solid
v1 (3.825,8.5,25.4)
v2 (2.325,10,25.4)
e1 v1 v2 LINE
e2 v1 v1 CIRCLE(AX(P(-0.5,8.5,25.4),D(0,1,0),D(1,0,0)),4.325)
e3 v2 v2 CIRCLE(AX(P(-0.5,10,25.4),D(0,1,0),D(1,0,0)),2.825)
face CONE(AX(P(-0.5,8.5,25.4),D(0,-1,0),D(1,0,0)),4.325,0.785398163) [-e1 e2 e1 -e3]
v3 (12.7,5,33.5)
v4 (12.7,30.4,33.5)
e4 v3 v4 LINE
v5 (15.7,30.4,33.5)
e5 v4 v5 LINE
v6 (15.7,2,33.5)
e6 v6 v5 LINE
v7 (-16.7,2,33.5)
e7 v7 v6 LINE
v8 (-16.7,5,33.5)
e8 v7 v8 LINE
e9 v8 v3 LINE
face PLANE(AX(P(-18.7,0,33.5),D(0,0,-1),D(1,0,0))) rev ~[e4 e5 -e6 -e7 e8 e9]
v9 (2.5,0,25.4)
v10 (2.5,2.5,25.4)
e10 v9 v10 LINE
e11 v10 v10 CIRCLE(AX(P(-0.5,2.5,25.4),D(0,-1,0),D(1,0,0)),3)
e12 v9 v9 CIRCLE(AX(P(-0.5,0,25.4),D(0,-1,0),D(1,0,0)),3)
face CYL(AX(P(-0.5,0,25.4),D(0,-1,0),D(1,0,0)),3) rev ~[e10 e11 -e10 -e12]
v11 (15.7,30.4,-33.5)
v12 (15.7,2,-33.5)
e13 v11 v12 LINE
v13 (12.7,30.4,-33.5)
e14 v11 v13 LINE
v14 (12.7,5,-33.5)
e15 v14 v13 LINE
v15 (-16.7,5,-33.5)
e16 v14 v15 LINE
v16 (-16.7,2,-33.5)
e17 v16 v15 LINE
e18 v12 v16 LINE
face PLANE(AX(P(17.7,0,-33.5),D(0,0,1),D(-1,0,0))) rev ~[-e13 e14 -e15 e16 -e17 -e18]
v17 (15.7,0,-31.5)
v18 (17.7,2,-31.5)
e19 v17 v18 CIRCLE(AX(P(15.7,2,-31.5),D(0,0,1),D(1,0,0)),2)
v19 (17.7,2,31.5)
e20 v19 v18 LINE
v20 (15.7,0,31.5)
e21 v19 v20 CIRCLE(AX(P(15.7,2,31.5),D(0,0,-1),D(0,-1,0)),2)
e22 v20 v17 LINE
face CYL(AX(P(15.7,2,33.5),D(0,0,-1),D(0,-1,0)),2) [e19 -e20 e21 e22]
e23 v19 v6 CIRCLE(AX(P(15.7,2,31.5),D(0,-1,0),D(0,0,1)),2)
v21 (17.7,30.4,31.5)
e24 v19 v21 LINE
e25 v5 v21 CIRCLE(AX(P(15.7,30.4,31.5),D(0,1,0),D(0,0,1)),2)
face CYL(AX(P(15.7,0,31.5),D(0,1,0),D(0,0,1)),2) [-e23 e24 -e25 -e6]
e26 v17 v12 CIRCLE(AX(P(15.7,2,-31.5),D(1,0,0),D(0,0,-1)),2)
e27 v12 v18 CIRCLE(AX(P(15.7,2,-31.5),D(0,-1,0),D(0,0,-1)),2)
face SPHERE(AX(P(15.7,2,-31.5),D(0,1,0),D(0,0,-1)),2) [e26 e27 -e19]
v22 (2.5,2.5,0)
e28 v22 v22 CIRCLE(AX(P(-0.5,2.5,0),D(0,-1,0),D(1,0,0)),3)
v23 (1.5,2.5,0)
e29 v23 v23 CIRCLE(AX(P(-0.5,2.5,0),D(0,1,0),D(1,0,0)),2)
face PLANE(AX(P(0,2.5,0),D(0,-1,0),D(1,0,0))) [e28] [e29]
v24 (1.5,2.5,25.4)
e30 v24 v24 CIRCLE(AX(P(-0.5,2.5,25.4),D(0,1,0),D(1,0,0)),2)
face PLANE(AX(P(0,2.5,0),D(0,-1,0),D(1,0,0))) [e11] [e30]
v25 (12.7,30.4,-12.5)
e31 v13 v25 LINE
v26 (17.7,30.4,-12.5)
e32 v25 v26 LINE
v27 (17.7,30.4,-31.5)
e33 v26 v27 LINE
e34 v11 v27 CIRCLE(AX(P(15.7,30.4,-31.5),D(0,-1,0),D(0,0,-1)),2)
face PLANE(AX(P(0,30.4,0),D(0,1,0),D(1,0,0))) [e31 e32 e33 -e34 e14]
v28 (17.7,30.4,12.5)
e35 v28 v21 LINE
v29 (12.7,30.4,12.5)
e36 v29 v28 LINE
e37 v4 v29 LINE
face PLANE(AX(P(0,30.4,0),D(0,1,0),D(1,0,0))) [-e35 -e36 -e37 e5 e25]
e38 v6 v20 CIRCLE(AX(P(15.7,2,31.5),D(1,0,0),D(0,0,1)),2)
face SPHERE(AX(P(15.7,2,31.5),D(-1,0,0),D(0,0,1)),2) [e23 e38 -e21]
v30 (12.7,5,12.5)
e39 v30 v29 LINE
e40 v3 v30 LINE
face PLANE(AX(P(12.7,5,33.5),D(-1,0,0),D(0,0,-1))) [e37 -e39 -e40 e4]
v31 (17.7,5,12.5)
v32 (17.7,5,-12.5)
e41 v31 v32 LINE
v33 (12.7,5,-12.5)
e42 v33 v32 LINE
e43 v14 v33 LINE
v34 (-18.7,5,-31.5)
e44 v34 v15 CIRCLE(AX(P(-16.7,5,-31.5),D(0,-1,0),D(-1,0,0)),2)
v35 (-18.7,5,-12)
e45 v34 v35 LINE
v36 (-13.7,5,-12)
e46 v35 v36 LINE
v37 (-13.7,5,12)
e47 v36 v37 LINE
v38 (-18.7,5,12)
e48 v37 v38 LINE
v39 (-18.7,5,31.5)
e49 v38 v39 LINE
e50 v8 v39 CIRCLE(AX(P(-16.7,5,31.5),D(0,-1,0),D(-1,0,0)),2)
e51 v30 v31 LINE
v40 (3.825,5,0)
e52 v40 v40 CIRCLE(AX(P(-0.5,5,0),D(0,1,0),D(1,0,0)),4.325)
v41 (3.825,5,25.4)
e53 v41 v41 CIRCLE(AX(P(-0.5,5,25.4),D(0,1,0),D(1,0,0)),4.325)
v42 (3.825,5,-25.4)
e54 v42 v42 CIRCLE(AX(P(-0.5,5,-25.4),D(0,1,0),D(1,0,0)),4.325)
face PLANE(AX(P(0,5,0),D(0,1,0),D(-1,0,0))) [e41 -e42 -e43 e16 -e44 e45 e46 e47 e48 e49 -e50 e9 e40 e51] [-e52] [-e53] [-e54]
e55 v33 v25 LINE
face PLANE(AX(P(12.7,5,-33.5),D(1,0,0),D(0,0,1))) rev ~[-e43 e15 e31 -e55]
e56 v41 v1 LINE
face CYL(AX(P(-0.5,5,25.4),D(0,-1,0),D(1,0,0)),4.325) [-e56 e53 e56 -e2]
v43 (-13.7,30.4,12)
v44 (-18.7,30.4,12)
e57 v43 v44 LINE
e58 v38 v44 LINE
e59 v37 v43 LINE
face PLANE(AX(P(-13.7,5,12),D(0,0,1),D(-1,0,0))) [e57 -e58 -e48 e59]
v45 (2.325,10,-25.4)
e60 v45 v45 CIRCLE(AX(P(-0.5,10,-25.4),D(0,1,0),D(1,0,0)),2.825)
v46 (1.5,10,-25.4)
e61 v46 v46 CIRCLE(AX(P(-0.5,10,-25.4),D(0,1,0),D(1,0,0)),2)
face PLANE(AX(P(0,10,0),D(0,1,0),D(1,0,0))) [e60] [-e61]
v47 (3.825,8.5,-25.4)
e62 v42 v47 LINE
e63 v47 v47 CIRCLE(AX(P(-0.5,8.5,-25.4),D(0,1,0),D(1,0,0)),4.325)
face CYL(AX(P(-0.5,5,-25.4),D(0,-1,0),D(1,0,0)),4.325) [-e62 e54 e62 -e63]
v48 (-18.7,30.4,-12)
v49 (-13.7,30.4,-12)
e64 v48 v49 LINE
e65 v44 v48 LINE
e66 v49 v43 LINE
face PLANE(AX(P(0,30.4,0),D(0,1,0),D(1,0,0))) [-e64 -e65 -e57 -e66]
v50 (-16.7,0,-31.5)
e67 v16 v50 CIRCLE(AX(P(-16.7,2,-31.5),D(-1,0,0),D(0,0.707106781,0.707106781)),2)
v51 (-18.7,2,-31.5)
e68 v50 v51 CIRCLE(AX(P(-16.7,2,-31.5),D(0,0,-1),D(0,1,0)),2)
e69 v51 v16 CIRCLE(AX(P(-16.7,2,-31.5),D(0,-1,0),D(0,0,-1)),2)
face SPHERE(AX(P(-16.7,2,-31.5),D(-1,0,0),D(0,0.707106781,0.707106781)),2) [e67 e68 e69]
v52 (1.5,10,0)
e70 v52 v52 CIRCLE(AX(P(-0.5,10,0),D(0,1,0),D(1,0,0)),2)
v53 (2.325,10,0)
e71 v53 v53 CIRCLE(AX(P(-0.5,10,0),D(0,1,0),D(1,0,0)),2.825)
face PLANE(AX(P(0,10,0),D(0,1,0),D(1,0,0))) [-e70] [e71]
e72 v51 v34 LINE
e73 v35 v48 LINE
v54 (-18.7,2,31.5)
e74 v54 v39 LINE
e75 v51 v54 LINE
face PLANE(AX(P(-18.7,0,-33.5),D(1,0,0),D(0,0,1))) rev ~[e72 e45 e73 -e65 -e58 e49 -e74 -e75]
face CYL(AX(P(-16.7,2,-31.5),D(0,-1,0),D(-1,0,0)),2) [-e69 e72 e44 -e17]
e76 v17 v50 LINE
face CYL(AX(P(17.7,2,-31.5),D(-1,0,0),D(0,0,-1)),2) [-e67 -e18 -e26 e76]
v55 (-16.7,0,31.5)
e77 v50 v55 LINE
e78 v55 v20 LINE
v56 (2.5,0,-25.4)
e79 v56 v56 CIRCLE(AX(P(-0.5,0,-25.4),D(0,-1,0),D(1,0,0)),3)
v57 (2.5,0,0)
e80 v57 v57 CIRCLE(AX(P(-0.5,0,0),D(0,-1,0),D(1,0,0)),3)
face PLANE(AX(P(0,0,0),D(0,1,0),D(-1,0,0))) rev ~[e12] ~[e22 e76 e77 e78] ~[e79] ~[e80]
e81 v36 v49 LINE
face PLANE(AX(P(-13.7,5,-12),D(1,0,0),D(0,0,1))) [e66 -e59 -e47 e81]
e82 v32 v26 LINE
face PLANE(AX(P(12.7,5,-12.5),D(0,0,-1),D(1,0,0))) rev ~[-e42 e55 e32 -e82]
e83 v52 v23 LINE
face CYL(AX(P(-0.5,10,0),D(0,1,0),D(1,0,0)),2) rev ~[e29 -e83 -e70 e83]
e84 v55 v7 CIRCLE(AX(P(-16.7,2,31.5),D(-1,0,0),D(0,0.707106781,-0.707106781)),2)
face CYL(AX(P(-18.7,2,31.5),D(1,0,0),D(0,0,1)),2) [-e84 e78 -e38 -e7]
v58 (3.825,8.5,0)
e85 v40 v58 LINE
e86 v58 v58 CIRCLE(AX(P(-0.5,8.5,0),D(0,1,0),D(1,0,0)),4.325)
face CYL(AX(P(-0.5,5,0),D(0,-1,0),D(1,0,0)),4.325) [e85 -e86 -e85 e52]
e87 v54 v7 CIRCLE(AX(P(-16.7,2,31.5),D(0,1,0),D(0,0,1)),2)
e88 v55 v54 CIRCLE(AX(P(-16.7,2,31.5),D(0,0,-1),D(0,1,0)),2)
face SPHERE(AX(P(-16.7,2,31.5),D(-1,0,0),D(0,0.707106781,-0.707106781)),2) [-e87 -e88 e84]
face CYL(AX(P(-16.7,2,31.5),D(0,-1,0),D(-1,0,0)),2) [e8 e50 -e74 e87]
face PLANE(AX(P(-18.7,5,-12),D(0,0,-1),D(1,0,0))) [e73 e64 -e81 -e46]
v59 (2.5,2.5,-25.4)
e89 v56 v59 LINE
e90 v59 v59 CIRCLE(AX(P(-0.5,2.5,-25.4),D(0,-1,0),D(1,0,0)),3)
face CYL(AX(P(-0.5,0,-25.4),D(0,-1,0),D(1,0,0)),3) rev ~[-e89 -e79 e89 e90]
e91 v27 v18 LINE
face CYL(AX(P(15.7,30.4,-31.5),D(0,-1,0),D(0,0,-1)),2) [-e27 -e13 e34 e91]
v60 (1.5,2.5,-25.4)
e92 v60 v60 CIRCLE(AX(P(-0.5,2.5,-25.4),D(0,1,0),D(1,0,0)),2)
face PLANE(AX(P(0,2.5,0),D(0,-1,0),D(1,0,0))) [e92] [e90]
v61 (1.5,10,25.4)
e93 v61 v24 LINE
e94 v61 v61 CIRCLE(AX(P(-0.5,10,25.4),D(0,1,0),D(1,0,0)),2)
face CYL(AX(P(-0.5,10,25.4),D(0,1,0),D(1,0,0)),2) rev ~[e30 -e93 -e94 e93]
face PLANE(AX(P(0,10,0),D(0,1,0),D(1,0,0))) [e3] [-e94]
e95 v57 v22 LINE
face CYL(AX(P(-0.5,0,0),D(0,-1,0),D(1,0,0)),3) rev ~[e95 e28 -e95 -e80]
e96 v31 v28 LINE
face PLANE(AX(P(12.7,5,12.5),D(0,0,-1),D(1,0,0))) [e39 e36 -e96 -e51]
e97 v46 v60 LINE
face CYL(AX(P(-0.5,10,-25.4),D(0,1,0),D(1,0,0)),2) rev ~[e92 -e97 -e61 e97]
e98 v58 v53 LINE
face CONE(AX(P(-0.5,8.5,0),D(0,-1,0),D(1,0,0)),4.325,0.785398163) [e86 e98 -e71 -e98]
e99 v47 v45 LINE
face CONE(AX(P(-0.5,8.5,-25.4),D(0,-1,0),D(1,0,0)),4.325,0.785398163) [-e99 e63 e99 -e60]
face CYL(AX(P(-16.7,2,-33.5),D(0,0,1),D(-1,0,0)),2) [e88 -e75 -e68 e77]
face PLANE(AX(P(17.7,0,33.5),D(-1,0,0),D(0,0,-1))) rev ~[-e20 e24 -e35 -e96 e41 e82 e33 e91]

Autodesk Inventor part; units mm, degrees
ref_plane "YZ Plane" through (0, 0, 0) normal (1, 0, 0) x (0, 1, 0)
ref_plane "XZ Plane" through (0, 0, 0) normal (0, 1, 0) x (-1, 0, 0)
ref_plane "XY Plane" through (0, 0, 0) normal (0, 0, 1) x (1, 0, 0)
sketch "Sketch1" plane through (0, 0, 0) normal (0, 1, 0) x (-1, 0, 0)
  line L0 (18.7, 33.5) -> (-17.7, 33.5)
  line L1 (-17.7, 33.5) -> (-17.7, -33.5)
  line L2 (-17.7, -33.5) -> (18.7, -33.5)
  line L3 (18.7, -33.5) -> (18.7, 33.5)
  point P0 (0, 0)
  dimension "d0" = 36.4
  dimension "d1" = 67
extrude "Extrusion1" add sketch "Sketch1" along normal blind 5
sketch "Sketch2" plane through (0, 5, 0) normal (0, 1, 0) x (1, 0, 0)
  line L0 (-18.7, -33.5) -> (17.7, -33.5) projected
  line L1 (17.7, -33.5) -> (12.7, -33.5)
  line L2 (12.7, -33.5) -> (12.7, -12.5)
  line L3 (12.7, -12.5) -> (17.7, -12.5)
  line L4 (17.7, -12.5) -> (17.7, -33.5)
  line L5 (17.7, -33.5) -> (17.7, 33.5) projected
  line L6 (17.7, 33.5) -> (12.7, 33.5)
  line L7 (12.7, 33.5) -> (12.7, 12.5)
  line L8 (12.7, 12.5) -> (17.7, 12.5)
  line L9 (17.7, 12.5) -> (17.7, 33.5)
  point P0 (0, 0)
  dimension "d4" = 5
  dimension "d5" = 21
  dimension "d6" = 5
  dimension "d7" = 21
extrude "Extrusion2" add sketch "Sketch2" along normal blind 25.4
fillet "Fillet2" radius 2 6 edges at (-0.5, 0, 33.5) (-18.7, 0, 0) (17.7, 15.2, 33.5) (17.7, 15.2, -33.5) (-0.5, 0, -33.5) (17.7, 0, 0)
sketch "Sketch6" plane through (0, 5, 0) normal (0, 1, 0) x (1, 0, 0)
  line L0 (-18.7, -33.5) -> (-18.7, 33.5) projected
  line L1 (-18.7, 12) -> (-13.7, 12)
  line L2 (-13.7, 12) -> (-13.7, -12)
  line L3 (-13.7, -12) -> (-18.7, -12)
  line L4 (-18.7, -12) -> (-18.7, 12)
  point P0 (0, 0)
  point P1 (-18.7, -12)
  dimension "d26" = 5
  dimension "d27" = 24
extrude "Extrusion6" add sketch "Sketch6" along normal blind 25.4
fillet "Fillet3" radius 2 4 edges at (-18.1142, 0.5858, 32.9142) (-18.7, 3.5, 33.5) (-18.1142, 0.5858, -32.9142) (-18.7, 3.5, -33.5)
sketch "Sketch8" plane through (0, 5, 0) normal (0, 1, 0) x (1, 0, 0)
  circle A0 centre (-0.5, 0) radius 4.325
  circle A1 centre (-0.5, -25.4) radius 4.325
  circle A2 centre (-0.5, 25.4) radius 4.325
  point P0 (0, 0)
  dimension "d37" = 8.65
  dimension "d38" = 8.65
  dimension "d39" = 8.65
extrude "Extrusion8" add sketch "Sketch8" along normal blind 5
chamfer "Chamfer1" distance 1.5 angle 45 3 edges at (-4.825, 10, 0) (-4.825, 10, -25.4) (-4.825, 10, 25.4)
sketch "Sketch9" plane through (-0.5, 10, 0) normal (0, 1, 0) x (1, 0, 0)
  circle A0 centre (0, 0) radius 2.825 projected
  circle A1 centre (0, 0) radius 2
  circle A2 centre (0, 25.4) radius 2.825 projected
  circle A3 centre (0, 25.4) radius 2
  circle A4 centre (0, -25.4) radius 2.825 projected
  circle A5 centre (0, -25.4) radius 2
  point P0 (0.5, 0)
  dimension "d45" = 4
  dimension "d46" = 4
  dimension "d47" = 4
extrude "Extrusion9" cut sketch "Sketch9" against normal blind 20 contours A1 | A3 | A5
sketch "Sketch10" plane through (0, 0, 0) normal (0, -1, 0) x (1, 0, 0)
  circle A0 centre (-0.5, -25.4) radius 2.825 projected
  circle A1 centre (-0.5, -25.4) radius 3
  circle A2 centre (-0.5, 0) radius 4.325 projected
  circle A3 centre (-0.5, 0) radius 3
  circle A4 centre (-0.5, 25.4) radius 2.825 projected
  circle A5 centre (-0.5, 25.4) radius 3
  point P0 (0, 0)
  dimension "d50" = 6
  dimension "d51" = 6
  dimension "d52" = 6
extrude "Extrusion10" cut sketch "Sketch10" against normal blind 2.5 contours A0 | A1 | A3 | A4 | A5
properties part number "3Wide5mm"
